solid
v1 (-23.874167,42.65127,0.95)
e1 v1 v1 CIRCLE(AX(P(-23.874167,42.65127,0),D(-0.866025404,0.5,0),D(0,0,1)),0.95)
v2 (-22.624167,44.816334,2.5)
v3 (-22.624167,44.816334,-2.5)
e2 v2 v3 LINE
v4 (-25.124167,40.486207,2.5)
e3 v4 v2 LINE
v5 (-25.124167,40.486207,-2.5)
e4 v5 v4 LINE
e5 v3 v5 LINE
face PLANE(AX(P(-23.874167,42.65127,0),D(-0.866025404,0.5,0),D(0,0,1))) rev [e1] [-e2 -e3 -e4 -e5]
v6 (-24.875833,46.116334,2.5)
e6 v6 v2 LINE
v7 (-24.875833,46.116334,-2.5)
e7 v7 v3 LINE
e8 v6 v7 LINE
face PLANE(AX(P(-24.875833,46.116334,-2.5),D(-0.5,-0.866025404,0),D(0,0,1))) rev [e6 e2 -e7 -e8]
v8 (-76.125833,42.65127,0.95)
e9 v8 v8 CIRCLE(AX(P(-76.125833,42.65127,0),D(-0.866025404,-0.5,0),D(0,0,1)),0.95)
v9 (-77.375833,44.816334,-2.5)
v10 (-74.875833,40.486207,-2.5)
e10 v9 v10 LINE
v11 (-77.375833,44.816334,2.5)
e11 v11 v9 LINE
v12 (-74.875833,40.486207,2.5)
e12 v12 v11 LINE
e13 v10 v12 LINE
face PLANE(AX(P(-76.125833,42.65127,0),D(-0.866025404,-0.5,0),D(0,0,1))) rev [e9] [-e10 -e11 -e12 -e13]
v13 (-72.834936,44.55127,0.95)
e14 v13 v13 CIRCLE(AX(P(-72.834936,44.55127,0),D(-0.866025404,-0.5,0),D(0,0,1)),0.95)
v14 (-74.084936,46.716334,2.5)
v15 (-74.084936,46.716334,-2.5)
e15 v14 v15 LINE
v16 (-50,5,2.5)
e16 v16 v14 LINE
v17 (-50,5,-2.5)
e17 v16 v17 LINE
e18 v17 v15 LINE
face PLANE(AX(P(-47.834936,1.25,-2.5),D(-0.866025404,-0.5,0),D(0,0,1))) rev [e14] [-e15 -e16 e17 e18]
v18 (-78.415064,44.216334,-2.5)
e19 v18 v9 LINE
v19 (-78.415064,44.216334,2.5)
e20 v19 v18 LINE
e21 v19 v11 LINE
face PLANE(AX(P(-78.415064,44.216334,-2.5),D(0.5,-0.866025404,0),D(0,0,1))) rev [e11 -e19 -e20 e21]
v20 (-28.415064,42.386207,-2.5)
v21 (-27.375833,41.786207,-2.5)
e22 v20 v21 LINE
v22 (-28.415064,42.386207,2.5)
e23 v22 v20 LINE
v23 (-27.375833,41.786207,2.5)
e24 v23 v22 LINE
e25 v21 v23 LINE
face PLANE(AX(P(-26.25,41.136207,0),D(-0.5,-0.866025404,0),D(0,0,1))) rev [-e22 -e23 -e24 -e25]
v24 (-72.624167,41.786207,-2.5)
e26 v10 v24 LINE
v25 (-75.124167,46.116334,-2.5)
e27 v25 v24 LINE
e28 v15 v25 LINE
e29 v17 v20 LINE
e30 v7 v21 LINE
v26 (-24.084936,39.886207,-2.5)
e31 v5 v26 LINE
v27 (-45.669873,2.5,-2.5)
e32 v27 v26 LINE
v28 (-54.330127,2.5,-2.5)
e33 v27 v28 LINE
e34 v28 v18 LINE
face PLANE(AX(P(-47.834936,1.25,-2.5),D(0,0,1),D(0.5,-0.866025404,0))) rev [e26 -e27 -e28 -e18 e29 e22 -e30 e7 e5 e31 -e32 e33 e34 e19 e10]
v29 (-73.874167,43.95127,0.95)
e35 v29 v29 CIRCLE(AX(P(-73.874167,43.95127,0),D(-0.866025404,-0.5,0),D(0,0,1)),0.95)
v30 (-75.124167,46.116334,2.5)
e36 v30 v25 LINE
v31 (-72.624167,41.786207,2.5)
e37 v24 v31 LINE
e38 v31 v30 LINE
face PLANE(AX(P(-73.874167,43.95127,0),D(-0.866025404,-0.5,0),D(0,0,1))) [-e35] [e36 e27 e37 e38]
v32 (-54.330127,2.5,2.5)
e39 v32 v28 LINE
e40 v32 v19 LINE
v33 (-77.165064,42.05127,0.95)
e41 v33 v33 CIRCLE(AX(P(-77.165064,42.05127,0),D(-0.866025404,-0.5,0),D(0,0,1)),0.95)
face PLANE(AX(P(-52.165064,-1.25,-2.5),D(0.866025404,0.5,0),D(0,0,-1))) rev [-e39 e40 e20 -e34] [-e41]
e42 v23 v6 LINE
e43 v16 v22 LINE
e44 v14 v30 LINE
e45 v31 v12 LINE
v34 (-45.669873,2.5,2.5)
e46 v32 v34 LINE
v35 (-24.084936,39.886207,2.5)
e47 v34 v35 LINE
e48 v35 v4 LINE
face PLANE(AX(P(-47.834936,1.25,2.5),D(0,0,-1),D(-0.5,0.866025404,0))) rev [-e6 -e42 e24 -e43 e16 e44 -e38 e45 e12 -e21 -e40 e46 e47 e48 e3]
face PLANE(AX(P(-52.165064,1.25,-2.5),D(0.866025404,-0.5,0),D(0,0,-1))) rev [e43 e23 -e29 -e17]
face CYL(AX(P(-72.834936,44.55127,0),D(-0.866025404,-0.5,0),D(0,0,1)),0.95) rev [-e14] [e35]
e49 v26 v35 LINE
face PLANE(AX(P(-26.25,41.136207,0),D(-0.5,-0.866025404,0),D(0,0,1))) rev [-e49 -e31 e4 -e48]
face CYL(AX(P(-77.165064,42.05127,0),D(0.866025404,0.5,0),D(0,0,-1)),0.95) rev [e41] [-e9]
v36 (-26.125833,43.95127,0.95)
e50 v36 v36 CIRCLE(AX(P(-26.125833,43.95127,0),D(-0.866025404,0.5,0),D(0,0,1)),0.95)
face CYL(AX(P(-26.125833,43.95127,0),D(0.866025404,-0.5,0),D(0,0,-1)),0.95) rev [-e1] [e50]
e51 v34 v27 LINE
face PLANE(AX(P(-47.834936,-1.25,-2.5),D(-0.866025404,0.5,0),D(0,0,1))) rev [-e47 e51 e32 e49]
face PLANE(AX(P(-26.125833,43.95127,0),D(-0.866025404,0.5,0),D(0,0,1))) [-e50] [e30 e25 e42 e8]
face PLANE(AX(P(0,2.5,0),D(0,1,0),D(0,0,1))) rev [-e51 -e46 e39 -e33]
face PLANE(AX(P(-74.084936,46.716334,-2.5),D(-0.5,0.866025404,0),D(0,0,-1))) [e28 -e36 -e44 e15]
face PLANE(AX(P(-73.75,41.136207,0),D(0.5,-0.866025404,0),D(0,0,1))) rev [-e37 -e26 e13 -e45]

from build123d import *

# Parameters (mm, degrees)
SKETCH1_W               = 5
SKETCH1_H               = 5
SKETCH1_R               = 0.95
CENTER_DEPTH            = 1.3
RIGHTSIDE_START         = 1.3
SKETCH1_2_W             = 5
SKETCH1_2_H             = 5
SKETCH1_2_R             = 0.95
RIGHTSIDE_DEPTH         = 1.2
LEFTSIDE_START          = -1.3
SKETCH1_3_W             = 5
SKETCH1_3_H             = 5
SKETCH1_3_R             = 0.95
LEFTSIDE_DEPTH          = 1.2
SKETCH3_W               = 5
SKETCH3_H               = 5
BOSS_EXTRUDE4_DEPTH     = 47.5
CUT_EXTRUDE1_DEPTH      = 5
CIRPATTERN2_COUNT       = 6
CIRPATTERN3_COUNT       = 3
CIRPATTERN4_START       = -44.601270189
CIRPATTERN4_OUTLINE_W   = 5
CIRPATTERN4_OUTLINE_H   = 5
CIRPATTERN4_OUTLINE_R   = 0.95
CIRPATTERN4_DEPTH       = 2.6
CIRPATTERN4_2_OUTLINE_W = 5
CIRPATTERN4_2_OUTLINE_H = 5
CIRPATTERN4_2_OUTLINE_R = 0.95
CIRPATTERN4_2_DEPTH     = 2.6
CIRPATTERN4_START_2     = -1.3
CIRPATTERN4_3_OUTLINE_W = 5
CIRPATTERN4_3_OUTLINE_H = 5
CIRPATTERN4_3_OUTLINE_R = 0.95
CIRPATTERN4_3_DEPTH     = 2.6
SKETCH5_W               = 5
SKETCH5_H               = 2.6
CUT_EXTRUDE2_DEPTH      = 5
INTERSECT1_START        = -46.716333699
INTERSECT1_OUTLINE_W    = 105
INTERSECT1_OUTLINE_H    = 5
INTERSECT1_OUTLINE_R    = 0.95
INTERSECT1_DEPTH        = 49.216333699


# Read off the part's stored shape, not the designer's step: CirPattern4, Intersect1
with BuildPart() as part:
    # Sketch1 → Center (new, symmetric)
    with BuildSketch(Plane(origin=(0, 0, 0), x_dir=(1, 0, 0), z_dir=(0, 1, 0))):
        Rectangle(SKETCH1_W, SKETCH1_H)
        with Locations(Location((0, 0, 0), (0, 0, 270))):
            Circle(SKETCH1_R, mode=Mode.SUBTRACT)
    extrude(amount=CENTER_DEPTH, both=True)

    # Sketch5 → Cut-Extrude2 (cut)
    with BuildSketch(Plane(origin=(2.5, 0, 0), x_dir=(0, 0, -1), z_dir=(1, 0, 0))):
        Rectangle(SKETCH5_W, SKETCH5_H)
    extrude(amount=-CUT_EXTRUDE2_DEPTH, mode=Mode.SUBTRACT)


with BuildPart() as body_2:
    # Sketch1<2> → RightSide (new body)
    with BuildSketch(Plane(origin=(0, 0, 0), x_dir=(1, 0, 0), z_dir=(0, 1, 0)).offset(RIGHTSIDE_START)):
        Rectangle(SKETCH1_2_W, SKETCH1_2_H)
        with Locations(Location((0, 0, 0), (0, 0, 270))):
            Circle(SKETCH1_2_R, mode=Mode.SUBTRACT)
    extrude(amount=RIGHTSIDE_DEPTH)


with BuildPart() as body_3:
    # Sketch1<3> → LeftSide (new body)
    with BuildSketch(Plane(origin=(0, 0, 0), x_dir=(1, 0, 0), z_dir=(0, 1, 0)).offset(LEFTSIDE_START)):
        Rectangle(SKETCH1_3_W, SKETCH1_3_H)
        with Locations(Location((0, 0, 0), (0, 0, 270))):
            Circle(SKETCH1_3_R, mode=Mode.SUBTRACT)
    extrude(amount=-LEFTSIDE_DEPTH)


with BuildPart() as body_4:
    # Sketch3 → Boss-Extrude4 (new body)
    with BuildSketch(Plane.ZY.offset(2.5)):
        Rectangle(SKETCH3_W, SKETCH3_H)
    extrude(amount=BOSS_EXTRUDE4_DEPTH)

    # Sketch4 → Cut-Extrude1 (cut)
    with BuildSketch(Plane.XY.offset(-2.5)):
        Polygon((-50, 0), (-50, -2.5), (-45.669872981, -2.5), align=None)
        Polygon((-50, 2.5), (-50, 0), (-45.669872981, 2.5), align=None)
    extrude(amount=CUT_EXTRUDE1_DEPTH, mode=Mode.SUBTRACT)


with BuildPart() as cirpattern2_1:
    # CirPattern2: pattern copy
    add(body_4.part.rotate(Axis((-50, 0, 0), (0, 0, 1)), 1 * 360 / CIRPATTERN2_COUNT))


with BuildPart() as cirpattern2_2:
    # CirPattern2: pattern copy
    add(body_4.part.rotate(Axis((-50, 0, 0), (0, 0, 1)), 2 * 360 / CIRPATTERN2_COUNT))


with BuildPart() as cirpattern2_3:
    # CirPattern2: pattern copy
    add(body_4.part.rotate(Axis((-50, 0, 0), (0, 0, 1)), 3 * 360 / CIRPATTERN2_COUNT))


with BuildPart() as cirpattern2_4:
    # CirPattern2: pattern copy
    add(body_4.part.rotate(Axis((-50, 0, 0), (0, 0, 1)), 4 * 360 / CIRPATTERN2_COUNT))


with BuildPart() as cirpattern2_5:
    # CirPattern2: pattern copy
    add(body_4.part.rotate(Axis((-50, 0, 0), (0, 0, 1)), 5 * 360 / CIRPATTERN2_COUNT))


with BuildPart() as cirpattern3_1:
    # CirPattern3: pattern copy
    add(body_3.part.rotate(Axis((-50, 0, 0), (0, 0, 1)), 1 * 360 / CIRPATTERN3_COUNT))


with BuildPart() as cirpattern3_2:
    # CirPattern3: pattern copy
    add(body_3.part.rotate(Axis((-50, 0, 0), (0, 0, 1)), 2 * 360 / CIRPATTERN3_COUNT))


with BuildPart() as cirpattern3_3:
    # CirPattern3: pattern copy
    add(body_2.part.rotate(Axis((-50, 0, 0), (0, 0, 1)), 1 * 360 / CIRPATTERN3_COUNT))


with BuildPart() as cirpattern3_4:
    # CirPattern3: pattern copy
    add(body_2.part.rotate(Axis((-50, 0, 0), (0, 0, 1)), 2 * 360 / CIRPATTERN3_COUNT))


with BuildPart() as body_14:
    # CirPattern4 outline → CirPattern4 (new body)
    with BuildSketch(Plane(origin=(0, 0, 0), x_dir=(0.49999999999999767, 0.86602540378444, 0), z_dir=(0.8660254037844399, -0.49999999999999795, 0)).offset(CIRPATTERN4_START)):
        with Locations((25, 0)):
            Rectangle(CIRPATTERN4_OUTLINE_W, CIRPATTERN4_OUTLINE_H)
        with Locations((25, 0)):
            Circle(CIRPATTERN4_OUTLINE_R, mode=Mode.SUBTRACT)
    extrude(amount=CIRPATTERN4_DEPTH)


with BuildPart() as body_15:
    # CirPattern4 2 outline → CirPattern4 2 (new body)
    with BuildSketch(Plane(origin=(0, 0, 0), x_dir=(0.5000000000000098, -0.8660254037844329, 0), z_dir=(0.8660254037844329, 0.50000000000001, 0)).offset(CIRPATTERN4_START)):
        with Locations((25, 0)):
            Rectangle(CIRPATTERN4_2_OUTLINE_W, CIRPATTERN4_2_OUTLINE_H)
        with Locations((25, 0)):
            Circle(CIRPATTERN4_2_OUTLINE_R, mode=Mode.SUBTRACT)
    extrude(amount=CIRPATTERN4_2_DEPTH)


with BuildPart() as body_16:
    # CirPattern4 3 outline → CirPattern4 3 (new body)
    with BuildSketch(Plane(origin=(0, 0, 0), x_dir=(1, 0, 0), z_dir=(0, 1, 0)).offset(CIRPATTERN4_START_2)):
        with Locations((-100, 0)):
            Rectangle(CIRPATTERN4_3_OUTLINE_W, CIRPATTERN4_3_OUTLINE_H)
        with Locations((-100, 0)):
            Circle(CIRPATTERN4_3_OUTLINE_R, mode=Mode.SUBTRACT)
    extrude(amount=CIRPATTERN4_3_DEPTH)


with BuildPart() as cirpattern2_5_1:
    add(cirpattern2_5.part)

    # Combine1: union CirPattern2_3, CirPattern2_4, body 16, CirPattern3_2, CirPattern3_4, body 15, CirPattern2_1, body 3, body 14, body 4, body 2, CirPattern2_2, CirPattern3_1, CirPattern3_3
    add(cirpattern2_3.part)
    add(cirpattern2_4.part)
    add(body_16.part)
    add(cirpattern3_2.part)
    add(cirpattern3_4.part)
    add(body_15.part)
    add(cirpattern2_1.part)
    add(body_3.part)
    add(body_14.part)
    add(body_4.part)
    add(body_2.part)
    add(cirpattern2_2.part)
    add(cirpattern3_1.part)
    add(cirpattern3_3.part)

    # Intersect1 outline → Intersect1 (cut)
    with BuildSketch(Plane(origin=(0, 0, 0), x_dir=(1, 0, 0), z_dir=(0, 1, 0)).offset(INTERSECT1_START)):
        with Locations((-50, 0)):
            Rectangle(INTERSECT1_OUTLINE_W, INTERSECT1_OUTLINE_H)
        with Locations((-100, 0)):
            Circle(INTERSECT1_OUTLINE_R, mode=Mode.SUBTRACT)
        Circle(INTERSECT1_OUTLINE_R, mode=Mode.SUBTRACT)
    extrude(amount=INTERSECT1_DEPTH, mode=Mode.SUBTRACT)


solid = cirpattern2_5_1.part
